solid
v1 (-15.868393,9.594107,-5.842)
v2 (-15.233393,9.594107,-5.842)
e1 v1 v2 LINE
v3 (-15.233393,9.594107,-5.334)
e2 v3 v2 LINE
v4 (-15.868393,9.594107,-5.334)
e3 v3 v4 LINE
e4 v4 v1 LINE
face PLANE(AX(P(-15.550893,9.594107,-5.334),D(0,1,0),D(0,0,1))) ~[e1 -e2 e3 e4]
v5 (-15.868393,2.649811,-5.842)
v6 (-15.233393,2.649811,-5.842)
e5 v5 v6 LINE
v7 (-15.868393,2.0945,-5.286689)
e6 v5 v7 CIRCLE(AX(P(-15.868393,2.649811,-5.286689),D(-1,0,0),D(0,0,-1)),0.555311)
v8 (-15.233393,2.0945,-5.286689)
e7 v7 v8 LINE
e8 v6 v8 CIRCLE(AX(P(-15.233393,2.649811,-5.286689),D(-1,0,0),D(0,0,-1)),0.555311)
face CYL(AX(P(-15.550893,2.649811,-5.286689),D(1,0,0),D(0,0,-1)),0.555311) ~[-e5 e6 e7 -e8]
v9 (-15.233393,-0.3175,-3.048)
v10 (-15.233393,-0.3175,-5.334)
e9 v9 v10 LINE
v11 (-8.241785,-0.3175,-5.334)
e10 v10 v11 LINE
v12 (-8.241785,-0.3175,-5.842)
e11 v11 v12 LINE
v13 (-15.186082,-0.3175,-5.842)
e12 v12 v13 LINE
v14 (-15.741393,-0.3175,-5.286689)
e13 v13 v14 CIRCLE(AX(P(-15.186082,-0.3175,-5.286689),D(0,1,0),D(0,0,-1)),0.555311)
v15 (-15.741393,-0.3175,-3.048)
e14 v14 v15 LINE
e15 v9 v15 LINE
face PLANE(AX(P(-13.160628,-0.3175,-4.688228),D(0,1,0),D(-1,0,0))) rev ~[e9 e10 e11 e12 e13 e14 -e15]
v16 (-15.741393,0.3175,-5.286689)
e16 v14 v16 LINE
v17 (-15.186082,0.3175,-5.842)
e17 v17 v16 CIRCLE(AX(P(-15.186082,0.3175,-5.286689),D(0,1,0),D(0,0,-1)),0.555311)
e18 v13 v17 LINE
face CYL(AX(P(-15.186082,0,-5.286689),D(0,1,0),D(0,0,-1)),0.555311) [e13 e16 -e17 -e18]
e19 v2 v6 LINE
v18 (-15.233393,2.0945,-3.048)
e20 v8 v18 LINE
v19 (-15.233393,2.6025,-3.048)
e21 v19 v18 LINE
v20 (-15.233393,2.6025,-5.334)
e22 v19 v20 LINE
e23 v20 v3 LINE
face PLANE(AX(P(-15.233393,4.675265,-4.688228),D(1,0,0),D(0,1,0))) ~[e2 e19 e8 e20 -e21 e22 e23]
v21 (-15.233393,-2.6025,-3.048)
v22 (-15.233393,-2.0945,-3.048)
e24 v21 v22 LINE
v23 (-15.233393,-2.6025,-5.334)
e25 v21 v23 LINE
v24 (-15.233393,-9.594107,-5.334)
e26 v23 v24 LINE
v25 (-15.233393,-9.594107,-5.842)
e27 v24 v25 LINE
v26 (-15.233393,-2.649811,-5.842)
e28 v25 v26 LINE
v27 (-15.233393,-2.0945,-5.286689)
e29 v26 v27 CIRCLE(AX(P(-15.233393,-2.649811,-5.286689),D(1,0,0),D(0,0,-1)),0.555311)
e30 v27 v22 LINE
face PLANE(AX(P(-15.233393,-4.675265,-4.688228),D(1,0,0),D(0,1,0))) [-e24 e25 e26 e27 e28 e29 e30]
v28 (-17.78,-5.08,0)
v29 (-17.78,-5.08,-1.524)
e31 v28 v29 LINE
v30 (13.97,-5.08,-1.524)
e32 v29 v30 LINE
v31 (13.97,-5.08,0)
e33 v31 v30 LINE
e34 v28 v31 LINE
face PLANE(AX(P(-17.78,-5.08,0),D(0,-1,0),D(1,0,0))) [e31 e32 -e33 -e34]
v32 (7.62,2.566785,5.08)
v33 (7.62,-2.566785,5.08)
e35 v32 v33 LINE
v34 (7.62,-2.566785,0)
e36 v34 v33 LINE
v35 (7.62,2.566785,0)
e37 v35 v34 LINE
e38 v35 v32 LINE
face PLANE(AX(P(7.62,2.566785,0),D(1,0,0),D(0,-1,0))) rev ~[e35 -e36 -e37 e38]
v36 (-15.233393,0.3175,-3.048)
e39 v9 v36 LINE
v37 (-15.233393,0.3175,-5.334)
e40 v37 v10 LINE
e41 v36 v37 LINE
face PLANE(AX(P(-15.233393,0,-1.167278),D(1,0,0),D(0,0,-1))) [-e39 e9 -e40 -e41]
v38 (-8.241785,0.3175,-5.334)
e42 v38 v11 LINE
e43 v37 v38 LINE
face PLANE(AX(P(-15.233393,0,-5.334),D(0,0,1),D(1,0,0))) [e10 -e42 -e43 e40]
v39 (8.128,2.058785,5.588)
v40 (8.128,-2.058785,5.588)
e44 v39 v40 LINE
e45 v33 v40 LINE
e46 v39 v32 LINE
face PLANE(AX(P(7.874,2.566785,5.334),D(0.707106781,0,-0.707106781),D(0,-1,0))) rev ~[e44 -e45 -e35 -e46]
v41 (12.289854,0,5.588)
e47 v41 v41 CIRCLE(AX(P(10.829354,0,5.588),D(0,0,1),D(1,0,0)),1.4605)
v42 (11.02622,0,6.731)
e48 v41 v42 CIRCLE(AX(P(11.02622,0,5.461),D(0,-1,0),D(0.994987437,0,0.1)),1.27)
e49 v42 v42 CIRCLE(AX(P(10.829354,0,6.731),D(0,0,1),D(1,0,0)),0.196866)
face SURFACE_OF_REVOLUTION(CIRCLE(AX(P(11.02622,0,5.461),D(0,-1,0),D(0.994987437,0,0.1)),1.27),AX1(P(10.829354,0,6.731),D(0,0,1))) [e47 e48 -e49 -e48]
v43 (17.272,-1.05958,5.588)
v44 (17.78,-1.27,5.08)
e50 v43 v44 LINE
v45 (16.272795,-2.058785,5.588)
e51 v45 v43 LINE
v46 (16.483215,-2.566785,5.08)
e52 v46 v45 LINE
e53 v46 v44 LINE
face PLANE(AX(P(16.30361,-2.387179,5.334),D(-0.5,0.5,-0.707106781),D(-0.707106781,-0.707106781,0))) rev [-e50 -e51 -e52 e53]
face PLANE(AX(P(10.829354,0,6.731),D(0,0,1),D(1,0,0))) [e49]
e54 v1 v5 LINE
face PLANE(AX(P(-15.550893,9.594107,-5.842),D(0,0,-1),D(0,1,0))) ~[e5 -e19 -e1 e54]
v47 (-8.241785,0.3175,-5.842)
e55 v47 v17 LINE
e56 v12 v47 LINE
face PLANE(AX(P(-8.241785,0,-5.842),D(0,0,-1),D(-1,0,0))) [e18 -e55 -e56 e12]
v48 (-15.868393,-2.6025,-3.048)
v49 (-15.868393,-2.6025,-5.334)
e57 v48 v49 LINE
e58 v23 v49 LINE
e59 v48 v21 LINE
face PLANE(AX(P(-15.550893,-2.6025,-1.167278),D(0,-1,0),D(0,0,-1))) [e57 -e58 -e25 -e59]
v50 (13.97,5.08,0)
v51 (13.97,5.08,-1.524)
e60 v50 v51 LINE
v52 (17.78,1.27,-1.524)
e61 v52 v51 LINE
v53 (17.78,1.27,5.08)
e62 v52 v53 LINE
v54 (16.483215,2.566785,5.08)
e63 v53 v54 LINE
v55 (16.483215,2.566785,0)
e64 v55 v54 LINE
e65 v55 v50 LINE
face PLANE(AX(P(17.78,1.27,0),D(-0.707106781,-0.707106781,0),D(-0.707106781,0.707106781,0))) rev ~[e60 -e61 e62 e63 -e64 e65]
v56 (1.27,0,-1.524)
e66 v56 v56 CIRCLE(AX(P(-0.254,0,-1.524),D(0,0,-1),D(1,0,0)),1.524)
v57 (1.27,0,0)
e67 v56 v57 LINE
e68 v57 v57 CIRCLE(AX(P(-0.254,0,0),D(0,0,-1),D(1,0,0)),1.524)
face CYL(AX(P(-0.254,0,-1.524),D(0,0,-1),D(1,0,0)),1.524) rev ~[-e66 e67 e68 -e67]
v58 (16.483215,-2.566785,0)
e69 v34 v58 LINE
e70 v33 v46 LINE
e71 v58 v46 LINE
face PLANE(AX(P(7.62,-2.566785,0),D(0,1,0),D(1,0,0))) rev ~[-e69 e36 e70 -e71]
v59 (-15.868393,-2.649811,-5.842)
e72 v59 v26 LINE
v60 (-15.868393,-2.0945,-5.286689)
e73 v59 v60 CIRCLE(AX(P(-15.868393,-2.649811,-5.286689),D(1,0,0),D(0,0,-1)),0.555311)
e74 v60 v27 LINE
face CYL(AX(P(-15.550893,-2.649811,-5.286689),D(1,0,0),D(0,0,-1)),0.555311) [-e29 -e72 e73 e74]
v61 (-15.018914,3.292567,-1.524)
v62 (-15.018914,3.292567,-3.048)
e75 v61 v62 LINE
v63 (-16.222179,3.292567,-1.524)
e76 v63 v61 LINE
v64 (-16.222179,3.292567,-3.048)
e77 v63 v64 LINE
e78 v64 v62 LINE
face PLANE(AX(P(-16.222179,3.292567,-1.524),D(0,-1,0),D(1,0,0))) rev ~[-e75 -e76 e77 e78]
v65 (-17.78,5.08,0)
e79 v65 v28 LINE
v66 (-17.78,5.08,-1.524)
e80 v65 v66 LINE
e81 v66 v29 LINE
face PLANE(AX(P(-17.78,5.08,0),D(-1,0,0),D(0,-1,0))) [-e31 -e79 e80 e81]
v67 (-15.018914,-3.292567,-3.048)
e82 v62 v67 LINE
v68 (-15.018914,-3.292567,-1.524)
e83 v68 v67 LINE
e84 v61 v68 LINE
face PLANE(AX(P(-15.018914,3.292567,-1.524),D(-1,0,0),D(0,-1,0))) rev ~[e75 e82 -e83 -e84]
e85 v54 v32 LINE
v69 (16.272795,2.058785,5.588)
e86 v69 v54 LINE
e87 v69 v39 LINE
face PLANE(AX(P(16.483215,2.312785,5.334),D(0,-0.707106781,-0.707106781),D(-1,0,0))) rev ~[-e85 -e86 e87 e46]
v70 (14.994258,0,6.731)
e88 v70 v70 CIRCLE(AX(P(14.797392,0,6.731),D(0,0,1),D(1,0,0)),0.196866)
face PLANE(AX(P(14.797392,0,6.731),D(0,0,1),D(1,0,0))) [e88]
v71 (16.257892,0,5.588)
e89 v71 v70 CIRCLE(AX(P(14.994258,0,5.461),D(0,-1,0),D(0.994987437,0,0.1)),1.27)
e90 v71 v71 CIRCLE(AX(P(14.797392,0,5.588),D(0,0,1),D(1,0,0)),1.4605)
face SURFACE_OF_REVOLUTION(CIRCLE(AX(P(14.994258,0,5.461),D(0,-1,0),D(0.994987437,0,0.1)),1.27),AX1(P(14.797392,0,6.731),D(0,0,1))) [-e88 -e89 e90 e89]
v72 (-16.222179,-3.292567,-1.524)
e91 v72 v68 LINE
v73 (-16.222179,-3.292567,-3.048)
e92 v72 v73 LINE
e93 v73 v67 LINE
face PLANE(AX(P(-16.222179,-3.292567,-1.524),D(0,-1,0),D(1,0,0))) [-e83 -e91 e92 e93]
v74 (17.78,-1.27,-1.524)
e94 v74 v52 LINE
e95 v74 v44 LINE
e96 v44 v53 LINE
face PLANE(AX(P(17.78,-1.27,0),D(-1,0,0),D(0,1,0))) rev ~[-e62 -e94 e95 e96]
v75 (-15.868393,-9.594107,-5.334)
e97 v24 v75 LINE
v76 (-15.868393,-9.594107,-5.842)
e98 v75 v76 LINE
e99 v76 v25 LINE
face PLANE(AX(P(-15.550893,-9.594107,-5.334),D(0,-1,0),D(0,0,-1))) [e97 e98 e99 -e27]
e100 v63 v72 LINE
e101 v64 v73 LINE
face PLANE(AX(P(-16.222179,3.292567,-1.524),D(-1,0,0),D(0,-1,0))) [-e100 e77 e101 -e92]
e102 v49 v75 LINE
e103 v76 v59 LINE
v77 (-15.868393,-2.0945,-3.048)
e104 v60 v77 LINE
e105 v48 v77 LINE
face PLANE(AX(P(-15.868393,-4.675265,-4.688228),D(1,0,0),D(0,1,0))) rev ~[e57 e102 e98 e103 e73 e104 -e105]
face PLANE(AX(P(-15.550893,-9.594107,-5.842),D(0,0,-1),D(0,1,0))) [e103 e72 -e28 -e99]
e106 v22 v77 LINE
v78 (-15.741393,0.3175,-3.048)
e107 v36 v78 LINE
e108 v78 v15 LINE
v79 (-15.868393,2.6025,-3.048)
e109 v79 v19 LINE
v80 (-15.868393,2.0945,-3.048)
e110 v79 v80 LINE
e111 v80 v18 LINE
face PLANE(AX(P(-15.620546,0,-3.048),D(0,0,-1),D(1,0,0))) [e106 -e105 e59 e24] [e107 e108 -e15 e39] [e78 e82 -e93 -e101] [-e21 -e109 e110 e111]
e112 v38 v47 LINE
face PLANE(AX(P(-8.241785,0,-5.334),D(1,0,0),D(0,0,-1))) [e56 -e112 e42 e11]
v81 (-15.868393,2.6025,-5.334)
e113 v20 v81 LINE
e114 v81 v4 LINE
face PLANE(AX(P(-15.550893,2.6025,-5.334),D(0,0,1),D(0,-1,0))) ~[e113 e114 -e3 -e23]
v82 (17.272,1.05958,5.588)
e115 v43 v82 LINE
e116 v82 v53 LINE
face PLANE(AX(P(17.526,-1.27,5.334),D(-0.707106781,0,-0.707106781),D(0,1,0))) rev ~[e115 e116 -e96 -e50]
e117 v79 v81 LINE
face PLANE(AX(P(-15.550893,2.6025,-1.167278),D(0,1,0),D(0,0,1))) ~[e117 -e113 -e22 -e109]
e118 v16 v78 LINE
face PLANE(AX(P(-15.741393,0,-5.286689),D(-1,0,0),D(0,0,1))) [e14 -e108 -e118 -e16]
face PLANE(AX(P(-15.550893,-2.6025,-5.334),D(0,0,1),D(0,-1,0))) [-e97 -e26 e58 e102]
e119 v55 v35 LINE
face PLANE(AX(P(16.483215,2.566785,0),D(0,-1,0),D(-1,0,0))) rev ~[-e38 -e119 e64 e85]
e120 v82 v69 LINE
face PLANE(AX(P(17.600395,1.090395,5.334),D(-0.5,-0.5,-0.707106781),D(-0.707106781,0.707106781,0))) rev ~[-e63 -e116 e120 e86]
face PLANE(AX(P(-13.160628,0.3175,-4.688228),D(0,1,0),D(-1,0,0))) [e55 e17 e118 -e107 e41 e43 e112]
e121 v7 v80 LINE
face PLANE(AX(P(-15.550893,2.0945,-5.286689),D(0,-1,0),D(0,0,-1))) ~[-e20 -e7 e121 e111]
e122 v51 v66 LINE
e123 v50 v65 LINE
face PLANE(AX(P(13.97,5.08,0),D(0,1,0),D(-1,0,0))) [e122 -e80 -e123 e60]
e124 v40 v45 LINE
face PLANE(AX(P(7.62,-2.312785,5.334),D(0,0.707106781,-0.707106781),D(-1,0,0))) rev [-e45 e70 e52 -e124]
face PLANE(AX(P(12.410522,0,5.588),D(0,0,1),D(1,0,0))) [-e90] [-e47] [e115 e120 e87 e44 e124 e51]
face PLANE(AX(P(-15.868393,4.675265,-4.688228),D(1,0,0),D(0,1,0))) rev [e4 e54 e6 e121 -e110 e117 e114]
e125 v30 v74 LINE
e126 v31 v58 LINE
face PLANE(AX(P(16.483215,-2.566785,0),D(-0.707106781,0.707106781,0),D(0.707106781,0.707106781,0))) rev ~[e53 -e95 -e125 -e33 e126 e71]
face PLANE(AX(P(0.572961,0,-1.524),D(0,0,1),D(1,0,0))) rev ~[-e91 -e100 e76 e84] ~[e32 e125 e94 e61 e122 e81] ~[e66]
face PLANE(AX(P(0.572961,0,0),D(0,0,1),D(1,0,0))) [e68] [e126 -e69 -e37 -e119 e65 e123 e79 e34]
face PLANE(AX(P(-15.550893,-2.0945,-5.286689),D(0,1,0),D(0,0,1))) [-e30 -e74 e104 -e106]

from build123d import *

# Parameters (mm, degrees)
F1_DEPTH  = 1.524
F3_DEPTH  = 5.588
F4_R      = 1.4605
F5_DEPTH  = 1.143
F7_SIZE   = 0.508
F9_DEPTH  = 0.3175
F11_ANGLE = 90
F13_ANGLE = 180
F15_W     = 1.2032650411
F15_H     = 6.585133262
F15_W_2   = 0.635
F15_H_2   = 0.508
F16_DEPTH = 1.524
F17_R     = 1.524
F18_DEPTH = 25.4


# Not quite as in the source:
# - a fillet or chamfer that OpenCascade refuses, or shapes differently, is made with other operations: its cross-section is extruded or revolved along the edge and cut away or added


with BuildPart() as f1:
    # F0 (on Top) → F1 (new body)
    with BuildSketch(Plane.XY):
        Polygon((-17.78, -5.08), (13.97, -5.08), (16.4832153797, -2.5667846203), (7.62, -2.5667846203), (7.62, 2.5667846203), (16.4832153797, 2.5667846203), (13.97, 5.08), (-17.78, 5.08), align=None)
        Polygon((7.62, -2.5667846203), (16.4832153797, -2.5667846203), (17.78, -1.27), (17.78, 1.27), (16.4832153797, 2.5667846203), (7.62, 2.5667846203), align=None)
    extrude(amount=-F1_DEPTH)

    # F2 (on face) → F3 (join)
    with BuildSketch(Plane.XY):
        Polygon((16.4832153797, -2.5667846203), (17.78, -1.27), (17.78, 1.27), (16.4832153797, 2.5667846203), (7.62, 2.5667846203), (7.62, -2.5667846203), align=None)
    extrude(amount=F3_DEPTH)

    # F4 (on face) → F5 (join)
    with BuildSketch(Plane.XY.offset(5.588)):
        with Locations((10.829353705, 0)):
            Circle(F4_R)
        with Locations((14.7973923013, 0)):
            Circle(F4_R)
    extrude(amount=F5_DEPTH)

    # F6: fillet of radius 1.27 on 2 edges, made by hand

    # F6_s1 → F6_t2 (revolve, cut)
    with BuildSketch(Plane.XZ):
        with BuildLine():
            ThreePointArc((12.289853705, 5.588), (11.8781615594, 6.4028572079), (11.0262196599, 6.731))
            Line((11.0262196599, 6.731), (12.289853705, 6.731))
            Line((12.289853705, 6.731), (12.289853705, 5.588))
        make_face()
    revolve(axis=Axis((10.829353705, 0, 6.731), (0, 0, 1)), mode=Mode.SUBTRACT)

    # F6_s3 → F6_t4 (revolve, cut)
    with BuildSketch(Plane.XZ):
        with BuildLine():
            ThreePointArc((16.2578923013, 5.588), (15.8462001556, 6.4028572079), (14.9942582561, 6.731))
            Line((14.9942582561, 6.731), (16.2578923013, 6.731))
            Line((16.2578923013, 6.731), (16.2578923013, 5.588))
        make_face()
    revolve(axis=Axis((14.7973923013, 0, 6.731), (0, 0, 1)), mode=Mode.SUBTRACT)

    # F7
    f7_edges = [f1.edges().sort_by_distance(p)[0] for p in [
        (12.051608, -2.566785, 5.588),
        (12.051608, 2.566785, 5.588),
        (7.62, 0, 5.588),
        (17.78, 0, 5.588),
        (17.131608, -1.918392, 5.588),
        (17.131608, 1.918392, 5.588),
    ]]
    chamfer(f7_edges, length=F7_SIZE)

    # F12: F10_1 across plane


with BuildPart() as f9:
    # F8 (on Front) → F9 (new body, symmetric)
    with BuildSketch(Plane.XZ):
        with BuildLine():
            Line((-22.86, -5.334), (-22.86, -5.842))
            Line((-22.86, -5.842), (-15.9157037269, -5.842))
            ThreePointArc((-15.9157037269, -5.842), (-15.5230394847, -5.6793531454), (-15.3603926301, -5.2866889032))
            Line((-15.3603926301, -5.2866889032), (-15.3603926301, -1.1672781548))
            Line((-15.3603926301, -1.1672781548), (-15.8683926301, -1.1672781548))
            Line((-15.8683926301, -1.1672781548), (-15.8683926301, -5.334))
            Line((-15.8683926301, -5.334), (-22.86, -5.334))
        make_face()
    extrude(amount=F9_DEPTH, both=True)


with BuildPart() as f10_1:
    # F10: copy of F9
    add(f9.part.moved(Location((0, -2.92, 0))))


with BuildPart() as f10_1_1:
    # F11: moved
    add(f10_1.part.rotate(Axis((-15.8683926301, -2.6025, -3.2506390774), (0, 0, 1)), F11_ANGLE))


with BuildPart() as f1_1:
    add(f1.part)
    add(f10_1_1.part.mirror(Plane.XZ))



with BuildPart() as f9_1:
    # F13: moved
    add(f9.part.rotate(Axis((-15.8683926301, 0.3175, -3.2506390774), (0, 0, 1)), F13_ANGLE))


with BuildPart() as f9_2:
    # F14: moved
    add(f9_1.part.moved(Location((0.635, -0.635, 0))))


with BuildPart() as f1_2:
    add(f1_1.part)

    add(f9_2.part)  # F16 merges F9

    add(f10_1_1.part)  # F16 merges F10_1
    # F15 (on face) → F16 (join)
    with BuildSketch(Plane(origin=(0, 0, -1.524), x_dir=(1, 0, 0), z_dir=(0, 0, -1))):
        with Locations((-15.6205464154, 0)):
            Rectangle(F15_W, F15_H)
        with Locations((-15.5508926301, -2.3485)):
            Rectangle(F15_W_2, F15_H_2, mode=Mode.SUBTRACT)
    extrude(amount=F16_DEPTH)

    # F17 (on face) → F18 (cut)
    with BuildSketch(Plane(origin=(0, 0, -1.524), x_dir=(1, 0, 0), z_dir=(0, 0, -1))):
        with Locations((-0.254, 0)):
            Circle(F17_R)
    extrude(amount=-F18_DEPTH, mode=Mode.SUBTRACT)


solid = f1_2.part
